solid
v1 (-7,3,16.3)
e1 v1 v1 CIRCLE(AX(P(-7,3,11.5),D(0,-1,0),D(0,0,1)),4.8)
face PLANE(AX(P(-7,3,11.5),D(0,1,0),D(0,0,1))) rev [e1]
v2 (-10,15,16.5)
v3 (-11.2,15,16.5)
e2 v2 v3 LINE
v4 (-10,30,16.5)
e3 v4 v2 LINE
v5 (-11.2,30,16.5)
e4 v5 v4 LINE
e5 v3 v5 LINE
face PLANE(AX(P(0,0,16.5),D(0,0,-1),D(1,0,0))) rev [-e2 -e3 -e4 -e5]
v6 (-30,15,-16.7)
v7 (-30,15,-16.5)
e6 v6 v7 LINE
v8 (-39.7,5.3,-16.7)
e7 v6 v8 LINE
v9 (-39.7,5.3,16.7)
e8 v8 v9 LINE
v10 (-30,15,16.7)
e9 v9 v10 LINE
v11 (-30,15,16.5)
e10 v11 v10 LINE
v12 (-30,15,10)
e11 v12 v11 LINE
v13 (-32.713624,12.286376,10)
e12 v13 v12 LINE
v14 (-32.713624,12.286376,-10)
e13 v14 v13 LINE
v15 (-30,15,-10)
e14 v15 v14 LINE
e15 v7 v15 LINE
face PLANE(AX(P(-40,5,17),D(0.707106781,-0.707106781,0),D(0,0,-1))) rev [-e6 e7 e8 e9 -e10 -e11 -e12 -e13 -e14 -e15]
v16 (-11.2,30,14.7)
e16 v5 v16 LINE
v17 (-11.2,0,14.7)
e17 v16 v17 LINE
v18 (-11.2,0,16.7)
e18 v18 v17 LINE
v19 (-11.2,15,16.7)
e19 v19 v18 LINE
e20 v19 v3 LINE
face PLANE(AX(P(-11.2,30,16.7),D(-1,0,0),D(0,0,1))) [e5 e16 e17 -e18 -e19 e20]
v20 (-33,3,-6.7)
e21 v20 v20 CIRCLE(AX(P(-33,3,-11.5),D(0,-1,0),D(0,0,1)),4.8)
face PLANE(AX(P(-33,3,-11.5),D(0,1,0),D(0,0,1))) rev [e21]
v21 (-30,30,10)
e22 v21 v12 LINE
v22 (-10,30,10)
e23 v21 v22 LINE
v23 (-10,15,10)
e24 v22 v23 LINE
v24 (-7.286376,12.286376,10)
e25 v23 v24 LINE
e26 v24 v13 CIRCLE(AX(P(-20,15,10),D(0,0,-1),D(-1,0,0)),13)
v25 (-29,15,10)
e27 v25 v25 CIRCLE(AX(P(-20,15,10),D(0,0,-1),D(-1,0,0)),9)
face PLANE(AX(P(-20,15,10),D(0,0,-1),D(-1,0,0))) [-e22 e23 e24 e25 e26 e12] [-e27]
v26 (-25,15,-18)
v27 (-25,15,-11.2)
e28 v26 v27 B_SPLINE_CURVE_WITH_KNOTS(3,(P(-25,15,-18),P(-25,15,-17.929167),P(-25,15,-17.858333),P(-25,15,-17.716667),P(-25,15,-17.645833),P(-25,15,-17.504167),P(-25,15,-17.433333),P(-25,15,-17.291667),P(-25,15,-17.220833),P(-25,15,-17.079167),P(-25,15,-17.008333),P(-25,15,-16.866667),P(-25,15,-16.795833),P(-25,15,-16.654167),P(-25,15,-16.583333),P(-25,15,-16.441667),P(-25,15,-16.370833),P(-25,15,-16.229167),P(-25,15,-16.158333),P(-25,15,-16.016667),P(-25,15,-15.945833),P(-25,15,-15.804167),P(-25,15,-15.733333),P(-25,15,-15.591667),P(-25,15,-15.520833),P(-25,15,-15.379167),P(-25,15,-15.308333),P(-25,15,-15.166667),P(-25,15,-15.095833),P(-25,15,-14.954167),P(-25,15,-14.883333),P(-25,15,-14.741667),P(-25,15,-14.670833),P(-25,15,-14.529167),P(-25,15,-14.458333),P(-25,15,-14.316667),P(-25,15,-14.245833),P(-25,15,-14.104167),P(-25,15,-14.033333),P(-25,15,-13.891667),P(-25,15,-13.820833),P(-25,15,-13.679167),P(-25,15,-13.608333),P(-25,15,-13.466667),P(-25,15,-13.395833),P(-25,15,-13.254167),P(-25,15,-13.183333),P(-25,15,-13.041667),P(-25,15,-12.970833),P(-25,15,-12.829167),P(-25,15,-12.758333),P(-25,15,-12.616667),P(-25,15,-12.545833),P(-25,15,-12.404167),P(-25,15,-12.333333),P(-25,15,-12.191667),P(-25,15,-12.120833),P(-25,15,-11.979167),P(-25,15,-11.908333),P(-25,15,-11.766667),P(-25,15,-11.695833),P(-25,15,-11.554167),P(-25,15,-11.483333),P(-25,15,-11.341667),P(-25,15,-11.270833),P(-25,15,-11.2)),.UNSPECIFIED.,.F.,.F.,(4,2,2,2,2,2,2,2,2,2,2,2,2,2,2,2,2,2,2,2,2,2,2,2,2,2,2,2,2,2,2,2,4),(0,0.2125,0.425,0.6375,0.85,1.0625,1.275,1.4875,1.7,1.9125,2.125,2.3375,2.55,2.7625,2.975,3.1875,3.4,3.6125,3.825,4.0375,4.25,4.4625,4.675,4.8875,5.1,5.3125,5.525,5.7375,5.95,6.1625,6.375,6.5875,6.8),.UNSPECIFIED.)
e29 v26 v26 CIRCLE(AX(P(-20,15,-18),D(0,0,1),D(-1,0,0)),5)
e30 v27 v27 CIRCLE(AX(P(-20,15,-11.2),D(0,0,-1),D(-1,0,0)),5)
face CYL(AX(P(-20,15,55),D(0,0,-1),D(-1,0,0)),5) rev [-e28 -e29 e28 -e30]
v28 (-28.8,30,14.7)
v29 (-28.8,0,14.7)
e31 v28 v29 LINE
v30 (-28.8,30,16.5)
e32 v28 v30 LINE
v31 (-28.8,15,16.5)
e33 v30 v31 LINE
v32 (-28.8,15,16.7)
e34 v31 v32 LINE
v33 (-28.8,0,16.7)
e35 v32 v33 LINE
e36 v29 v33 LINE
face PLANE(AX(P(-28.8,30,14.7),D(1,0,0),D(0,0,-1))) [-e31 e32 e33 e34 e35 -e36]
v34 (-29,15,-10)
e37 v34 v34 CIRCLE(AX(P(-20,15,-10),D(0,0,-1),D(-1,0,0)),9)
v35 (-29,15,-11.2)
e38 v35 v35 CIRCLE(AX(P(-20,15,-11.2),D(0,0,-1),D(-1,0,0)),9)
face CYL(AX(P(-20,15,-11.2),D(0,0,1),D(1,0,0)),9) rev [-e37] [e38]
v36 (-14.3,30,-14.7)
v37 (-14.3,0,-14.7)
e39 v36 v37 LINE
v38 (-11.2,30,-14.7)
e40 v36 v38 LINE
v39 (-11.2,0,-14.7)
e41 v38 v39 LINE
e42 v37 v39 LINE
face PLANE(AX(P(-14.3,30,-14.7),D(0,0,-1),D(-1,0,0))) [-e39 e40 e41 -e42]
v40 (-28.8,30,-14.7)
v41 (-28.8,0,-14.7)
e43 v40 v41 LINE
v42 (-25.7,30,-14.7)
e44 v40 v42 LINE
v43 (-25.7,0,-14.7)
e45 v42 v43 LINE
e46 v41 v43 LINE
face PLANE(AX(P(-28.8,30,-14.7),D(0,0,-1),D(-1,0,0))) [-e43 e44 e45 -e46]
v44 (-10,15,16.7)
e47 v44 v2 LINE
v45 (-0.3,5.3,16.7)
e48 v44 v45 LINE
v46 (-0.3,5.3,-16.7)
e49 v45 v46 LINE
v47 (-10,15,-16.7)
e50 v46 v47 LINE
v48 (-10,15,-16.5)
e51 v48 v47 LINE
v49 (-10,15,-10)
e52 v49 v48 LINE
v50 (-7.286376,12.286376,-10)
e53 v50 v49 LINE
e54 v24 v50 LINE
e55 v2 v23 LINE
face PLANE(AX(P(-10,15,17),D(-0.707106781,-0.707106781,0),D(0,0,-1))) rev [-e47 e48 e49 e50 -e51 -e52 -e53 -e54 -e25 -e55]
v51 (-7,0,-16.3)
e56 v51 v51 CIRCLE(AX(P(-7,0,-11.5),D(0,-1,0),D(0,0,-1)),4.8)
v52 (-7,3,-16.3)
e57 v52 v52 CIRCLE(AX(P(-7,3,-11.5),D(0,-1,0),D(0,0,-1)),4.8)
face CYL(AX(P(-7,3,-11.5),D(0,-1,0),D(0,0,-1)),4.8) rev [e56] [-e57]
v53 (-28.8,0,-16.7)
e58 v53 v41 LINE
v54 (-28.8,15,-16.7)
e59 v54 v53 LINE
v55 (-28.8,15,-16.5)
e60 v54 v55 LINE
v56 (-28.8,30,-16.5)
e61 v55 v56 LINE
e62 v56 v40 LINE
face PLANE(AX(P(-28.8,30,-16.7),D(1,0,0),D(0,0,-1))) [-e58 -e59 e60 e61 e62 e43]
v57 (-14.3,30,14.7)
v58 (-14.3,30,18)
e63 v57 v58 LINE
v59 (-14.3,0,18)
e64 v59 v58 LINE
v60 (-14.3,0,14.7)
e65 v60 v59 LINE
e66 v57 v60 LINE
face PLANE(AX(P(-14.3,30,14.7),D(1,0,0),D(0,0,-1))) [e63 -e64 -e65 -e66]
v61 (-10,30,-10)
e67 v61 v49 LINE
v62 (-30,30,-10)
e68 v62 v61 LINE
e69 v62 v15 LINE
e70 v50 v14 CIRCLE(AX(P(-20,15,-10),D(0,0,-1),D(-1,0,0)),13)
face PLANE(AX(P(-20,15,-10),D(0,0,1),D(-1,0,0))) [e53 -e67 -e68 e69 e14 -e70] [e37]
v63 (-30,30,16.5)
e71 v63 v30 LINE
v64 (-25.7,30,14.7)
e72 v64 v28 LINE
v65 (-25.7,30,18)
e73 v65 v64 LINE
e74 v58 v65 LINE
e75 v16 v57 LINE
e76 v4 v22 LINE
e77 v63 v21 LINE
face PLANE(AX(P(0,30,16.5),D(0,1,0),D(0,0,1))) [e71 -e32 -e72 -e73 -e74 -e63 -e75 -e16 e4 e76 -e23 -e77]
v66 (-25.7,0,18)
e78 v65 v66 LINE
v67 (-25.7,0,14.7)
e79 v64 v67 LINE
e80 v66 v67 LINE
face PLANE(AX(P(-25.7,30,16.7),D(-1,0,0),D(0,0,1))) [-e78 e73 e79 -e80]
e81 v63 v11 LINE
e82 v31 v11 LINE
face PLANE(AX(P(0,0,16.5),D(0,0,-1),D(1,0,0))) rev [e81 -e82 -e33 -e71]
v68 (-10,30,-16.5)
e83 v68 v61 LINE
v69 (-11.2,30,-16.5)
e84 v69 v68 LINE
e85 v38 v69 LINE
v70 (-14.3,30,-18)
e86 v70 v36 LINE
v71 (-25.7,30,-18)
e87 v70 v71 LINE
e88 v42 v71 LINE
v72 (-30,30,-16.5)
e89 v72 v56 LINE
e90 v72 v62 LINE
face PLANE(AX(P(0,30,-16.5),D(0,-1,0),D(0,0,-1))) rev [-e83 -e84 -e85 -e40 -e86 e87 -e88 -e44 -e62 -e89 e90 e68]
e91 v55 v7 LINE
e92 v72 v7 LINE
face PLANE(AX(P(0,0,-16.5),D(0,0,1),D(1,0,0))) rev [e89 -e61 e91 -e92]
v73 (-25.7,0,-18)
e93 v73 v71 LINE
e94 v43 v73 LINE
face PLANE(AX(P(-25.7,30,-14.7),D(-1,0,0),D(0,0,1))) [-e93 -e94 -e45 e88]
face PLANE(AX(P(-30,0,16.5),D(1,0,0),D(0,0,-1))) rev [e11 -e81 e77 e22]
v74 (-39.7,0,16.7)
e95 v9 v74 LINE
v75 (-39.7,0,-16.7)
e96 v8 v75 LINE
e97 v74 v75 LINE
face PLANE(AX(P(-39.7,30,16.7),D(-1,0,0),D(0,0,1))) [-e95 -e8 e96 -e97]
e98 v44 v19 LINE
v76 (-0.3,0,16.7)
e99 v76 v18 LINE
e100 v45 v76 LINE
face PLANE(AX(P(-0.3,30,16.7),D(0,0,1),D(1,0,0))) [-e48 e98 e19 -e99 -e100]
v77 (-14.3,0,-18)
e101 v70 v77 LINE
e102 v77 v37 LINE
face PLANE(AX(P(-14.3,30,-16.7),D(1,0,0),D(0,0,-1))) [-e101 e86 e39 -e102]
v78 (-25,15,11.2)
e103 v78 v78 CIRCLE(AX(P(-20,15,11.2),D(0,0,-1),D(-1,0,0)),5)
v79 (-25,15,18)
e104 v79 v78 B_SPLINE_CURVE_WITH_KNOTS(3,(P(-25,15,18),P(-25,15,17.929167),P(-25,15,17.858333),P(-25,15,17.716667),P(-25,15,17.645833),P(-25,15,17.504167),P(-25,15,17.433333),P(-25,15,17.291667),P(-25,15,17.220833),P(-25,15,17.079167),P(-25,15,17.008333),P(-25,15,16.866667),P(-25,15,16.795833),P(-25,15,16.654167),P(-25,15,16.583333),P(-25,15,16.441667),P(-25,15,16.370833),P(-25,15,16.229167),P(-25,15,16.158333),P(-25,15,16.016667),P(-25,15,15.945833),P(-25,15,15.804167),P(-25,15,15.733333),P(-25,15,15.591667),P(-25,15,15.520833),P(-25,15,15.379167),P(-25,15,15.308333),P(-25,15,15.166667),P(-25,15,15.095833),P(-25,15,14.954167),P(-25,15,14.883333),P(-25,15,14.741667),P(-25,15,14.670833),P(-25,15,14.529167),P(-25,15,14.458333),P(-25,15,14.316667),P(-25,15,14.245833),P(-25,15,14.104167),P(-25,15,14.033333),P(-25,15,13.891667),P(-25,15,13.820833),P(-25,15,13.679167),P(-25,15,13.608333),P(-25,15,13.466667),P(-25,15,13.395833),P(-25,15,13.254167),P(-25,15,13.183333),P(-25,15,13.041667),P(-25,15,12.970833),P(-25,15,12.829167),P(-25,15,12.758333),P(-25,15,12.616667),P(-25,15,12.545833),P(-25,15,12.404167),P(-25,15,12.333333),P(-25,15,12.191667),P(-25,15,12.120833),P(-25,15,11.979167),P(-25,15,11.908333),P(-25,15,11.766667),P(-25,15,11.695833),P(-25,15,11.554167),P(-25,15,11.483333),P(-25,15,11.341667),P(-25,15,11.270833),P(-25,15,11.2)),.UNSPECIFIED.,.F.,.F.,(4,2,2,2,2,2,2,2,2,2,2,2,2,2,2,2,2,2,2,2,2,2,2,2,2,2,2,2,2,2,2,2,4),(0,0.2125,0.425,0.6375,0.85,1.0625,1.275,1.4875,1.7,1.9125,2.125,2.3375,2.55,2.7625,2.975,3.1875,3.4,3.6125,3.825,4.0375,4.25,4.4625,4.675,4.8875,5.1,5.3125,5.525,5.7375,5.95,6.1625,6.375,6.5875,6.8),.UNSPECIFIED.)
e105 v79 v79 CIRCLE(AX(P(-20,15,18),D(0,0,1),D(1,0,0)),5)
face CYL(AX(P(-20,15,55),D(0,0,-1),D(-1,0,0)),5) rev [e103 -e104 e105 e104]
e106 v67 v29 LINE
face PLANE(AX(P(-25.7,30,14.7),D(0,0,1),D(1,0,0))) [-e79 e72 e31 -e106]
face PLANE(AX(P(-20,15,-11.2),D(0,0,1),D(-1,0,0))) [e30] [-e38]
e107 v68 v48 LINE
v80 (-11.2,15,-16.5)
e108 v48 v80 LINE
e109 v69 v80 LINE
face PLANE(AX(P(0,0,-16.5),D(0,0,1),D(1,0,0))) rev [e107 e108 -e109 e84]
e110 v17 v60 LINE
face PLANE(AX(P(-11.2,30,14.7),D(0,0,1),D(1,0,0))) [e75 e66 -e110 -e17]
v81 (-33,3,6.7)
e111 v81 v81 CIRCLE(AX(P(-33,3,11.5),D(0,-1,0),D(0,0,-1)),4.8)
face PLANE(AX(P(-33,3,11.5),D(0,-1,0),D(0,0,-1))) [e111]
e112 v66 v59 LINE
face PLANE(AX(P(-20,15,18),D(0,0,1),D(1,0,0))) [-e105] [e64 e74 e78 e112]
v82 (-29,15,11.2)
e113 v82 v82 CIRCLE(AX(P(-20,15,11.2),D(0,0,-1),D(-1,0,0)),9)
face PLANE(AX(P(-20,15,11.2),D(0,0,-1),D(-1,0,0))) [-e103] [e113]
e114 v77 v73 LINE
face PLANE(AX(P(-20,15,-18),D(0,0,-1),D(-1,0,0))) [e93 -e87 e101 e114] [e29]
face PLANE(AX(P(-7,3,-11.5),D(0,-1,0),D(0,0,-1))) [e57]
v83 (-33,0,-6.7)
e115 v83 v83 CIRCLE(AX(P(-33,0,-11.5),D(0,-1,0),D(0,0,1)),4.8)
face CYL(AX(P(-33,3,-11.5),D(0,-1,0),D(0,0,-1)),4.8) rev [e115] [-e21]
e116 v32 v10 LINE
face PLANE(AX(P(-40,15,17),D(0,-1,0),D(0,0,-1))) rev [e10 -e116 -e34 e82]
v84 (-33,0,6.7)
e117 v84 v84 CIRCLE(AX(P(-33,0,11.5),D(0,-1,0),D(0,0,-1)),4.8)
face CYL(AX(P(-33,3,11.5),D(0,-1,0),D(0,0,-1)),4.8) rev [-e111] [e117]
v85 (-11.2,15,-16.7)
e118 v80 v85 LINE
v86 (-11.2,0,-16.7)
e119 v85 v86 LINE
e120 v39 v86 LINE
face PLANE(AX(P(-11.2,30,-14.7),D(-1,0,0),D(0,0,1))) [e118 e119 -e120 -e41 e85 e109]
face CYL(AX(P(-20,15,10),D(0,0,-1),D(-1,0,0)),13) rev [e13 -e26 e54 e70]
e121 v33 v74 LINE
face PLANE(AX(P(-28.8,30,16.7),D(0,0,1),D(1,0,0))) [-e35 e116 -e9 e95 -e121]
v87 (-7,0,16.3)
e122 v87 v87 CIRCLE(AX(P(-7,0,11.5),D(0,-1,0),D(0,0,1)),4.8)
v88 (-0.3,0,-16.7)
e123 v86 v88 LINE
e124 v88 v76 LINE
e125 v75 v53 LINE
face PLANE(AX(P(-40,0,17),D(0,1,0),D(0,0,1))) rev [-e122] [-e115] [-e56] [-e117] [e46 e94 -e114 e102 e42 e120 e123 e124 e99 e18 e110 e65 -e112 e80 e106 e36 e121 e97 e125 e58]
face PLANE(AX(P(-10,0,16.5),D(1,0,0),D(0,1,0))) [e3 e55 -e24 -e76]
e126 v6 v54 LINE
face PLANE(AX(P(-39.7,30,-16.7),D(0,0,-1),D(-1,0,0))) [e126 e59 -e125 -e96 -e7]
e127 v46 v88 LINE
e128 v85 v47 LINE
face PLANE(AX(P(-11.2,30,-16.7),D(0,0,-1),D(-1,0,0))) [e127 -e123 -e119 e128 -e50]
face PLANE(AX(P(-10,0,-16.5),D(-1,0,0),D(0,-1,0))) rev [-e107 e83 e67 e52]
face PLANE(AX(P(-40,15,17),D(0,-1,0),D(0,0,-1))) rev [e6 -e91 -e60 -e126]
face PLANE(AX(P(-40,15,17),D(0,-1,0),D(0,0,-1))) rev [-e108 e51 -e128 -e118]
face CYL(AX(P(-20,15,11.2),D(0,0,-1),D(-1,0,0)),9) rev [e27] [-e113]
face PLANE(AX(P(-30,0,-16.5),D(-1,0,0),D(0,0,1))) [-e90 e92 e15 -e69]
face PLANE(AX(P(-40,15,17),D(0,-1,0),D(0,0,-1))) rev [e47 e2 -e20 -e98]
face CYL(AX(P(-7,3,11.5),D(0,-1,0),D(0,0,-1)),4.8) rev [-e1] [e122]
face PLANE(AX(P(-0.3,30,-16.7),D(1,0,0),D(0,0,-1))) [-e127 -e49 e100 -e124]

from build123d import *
from build123d.topology import SkipClean

# Parameters (mm, degrees)
SKETCH5_W            = 40
SKETCH5_H            = 15
BOSS_EXTRUDE2_DEPTH  = 17
SKETCH6_R            = 13
CUT_EXTRUDE4_DEPTH   = 10
SKETCH7_R            = 2.5
CUT_EXTRUDE5_DEPTH   = 4.5
CHAMFER8_SIZE        = 10
BOSS_EXTRUDE3_START  = -6.5
BOSS_EXTRUDE3_DEPTH  = 6.5
SKETCH8_R            = 4.8
CUT_EXTRUDE8_DEPTH   = 3
SKETCH9_W            = 2.5
SKETCH9_H            = 2
CUT_EXTRUDE7_DEPTH   = 52
SKETCH11_R           = 5
CUT_EXTRUDE9_DEPTH   = 45
SKETCH12_R           = 9
SKETCH12_R_2         = 5
CUT_EXTRUDE11_DEPTH  = 1.2
CUT_EXTRUDE12_DEPTH  = 53.810983706
BOSS_EXTRUDE4_START  = 1.3
BOSS_EXTRUDE4_DEPTH  = 1.3
BOSS_EXTRUDE8_START  = -33.4
BOSS_EXTRUDE8_DEPTH  = 1.3
BOSS_EXTRUDE9_DEPTH  = 1.5
BOSS_EXTRUDE10_START = -34.5
BOSS_EXTRUDE10_DEPTH = 1.5


# Read off the part's stored shape, not the designer's step: Boss-Extrude3
with BuildPart() as part:
    # Sketch5 → Boss-Extrude2 (new body)
    with BuildSketch(Plane.XY):
        with Locations((-20, 7.5)):
            Rectangle(SKETCH5_W, SKETCH5_H)
    boss_extrude2 = extrude(amount=BOSS_EXTRUDE2_DEPTH)

    # Sketch6 → Cut-Extrude4 (cut)
    with BuildSketch(Plane(origin=(0, 0, 0), x_dir=(-1, 0, 0), z_dir=(0, 0, -1))):
        with Locations((20, 15)):
            Circle(SKETCH6_R)
    cut_extrude4 = extrude(amount=-CUT_EXTRUDE4_DEPTH, mode=Mode.SUBTRACT)

    # Sketch7 → Cut-Extrude5 (cut)
    with BuildSketch(Plane.XY.offset(17)):
        with Locations((-20, 15)):
            Circle(SKETCH7_R)
    cut_extrude5 = extrude(amount=-CUT_EXTRUDE5_DEPTH, mode=Mode.SUBTRACT)

    # Mirror5: Boss-Extrude2, Cut-Extrude4, Cut-Extrude5 across plane
    with SkipClean():  # the faces are left unmerged after this step: merging them gives an invalid solid
        add(boss_extrude2.mirror(Plane.XY))
        add(cut_extrude4.mirror(Plane.XY), mode=Mode.SUBTRACT)
        add(cut_extrude5.mirror(Plane.XY), mode=Mode.SUBTRACT)
    add(part.part.scale(1), mode=Mode.REPLACE)  # the faces are merged on a copy

    # Chamfer8
    # the kernel refuses this chamfer: 10 mm, written as the material it takes off along each edge
    with BuildSketch(Plane(origin=(-40, 15, -42.71682988), x_dir=(0.9996219169112968, 0.027495876610586317, 0), z_dir=(0, 0, 1)), Plane(origin=(0, 15, 42.71682988), x_dir=(-0.9996219169112968, 0.027495876610586317, 0), z_dir=(0, 0, -1))) as chamfer8_piece_1:
        Polygon((CHAMFER8_SIZE * 0.999621916911, -CHAMFER8_SIZE * 0.0274958766106), (-CHAMFER8_SIZE * 0.0274958766106, -CHAMFER8_SIZE * 0.999621916911), (0, 0), align=None)
    extrude(amount=85.433659759, mode=Mode.SUBTRACT)

    # Boss-Extrude3 outline → Boss-Extrude3 (add)
    with BuildSketch(Plane.XY.offset(-10).offset(BOSS_EXTRUDE3_START)):
        with BuildLine():
            Line((-10, 30), (-30, 30))
            Line((-30, 30), (-30, 15))
            Line((-30, 15), (-22.5, 15))
            ThreePointArc((-22.5, 15), (-20, 12.5), (-17.5, 15))
            Line((-17.5, 15), (-10, 15))
            Line((-10, 15), (-10, 30))
        make_face()
    boss_extrude3 = extrude(amount=BOSS_EXTRUDE3_DEPTH)

    # Mirror6: Boss-Extrude3 across plane
    add(boss_extrude3.mirror(Plane(origin=(0, 0, 0), x_dir=(1, 0, 0), z_dir=(0, 0, -1))))

    # Sketch8 → Cut-Extrude8 (cut)
    with BuildSketch(Plane.XZ):
        with Locations(Location((-33, 11.5, 0), (0, 0, 270))):
            Circle(SKETCH8_R)
        with Locations(Location((-7, 11.5, 0), (0, 0, 90))):
            Circle(SKETCH8_R)
        with Locations(Location((-7, -11.5, 0), (0, 0, 270))):
            Circle(SKETCH8_R)
        with Locations(Location((-33, -11.5, 0), (0, 0, 90))):
            Circle(SKETCH8_R)
    extrude(amount=-CUT_EXTRUDE8_DEPTH, mode=Mode.SUBTRACT)

    # Sketch9 → Cut-Extrude7 (cut)
    with BuildSketch(Plane.XZ):
        with Locations((-12.75, 16)):
            Rectangle(SKETCH9_W, SKETCH9_H)
        with Locations((-27.25, 16)):
            Rectangle(SKETCH9_W, SKETCH9_H)
        with Locations((-12.75, -16)):
            Rectangle(SKETCH9_W, SKETCH9_H)
        with Locations((-27.25, -16)):
            Rectangle(SKETCH9_W, SKETCH9_H)
    extrude(amount=-CUT_EXTRUDE7_DEPTH, mode=Mode.SUBTRACT)

    # Sketch11 → Cut-Extrude9 (cut, symmetric)
    with BuildSketch(Plane(origin=(0, 0, 10), x_dir=(-1, 0, 0), z_dir=(0, 0, -1))):
        with Locations((20, 15)):
            Circle(SKETCH11_R)
    extrude(amount=CUT_EXTRUDE9_DEPTH, both=True, mode=Mode.SUBTRACT)

    # Sketch12 → Cut-Extrude11 (cut)
    with BuildSketch(Plane(origin=(0, 0, 10), x_dir=(-1, 0, 0), z_dir=(0, 0, -1))):
        with Locations((20, 15)):
            Circle(SKETCH12_R)
        with Locations((20, 15)):
            Circle(SKETCH12_R_2, mode=Mode.SUBTRACT)
    cut_extrude11 = extrude(amount=-CUT_EXTRUDE11_DEPTH, mode=Mode.SUBTRACT)

    # Mirror7: Cut-Extrude11 across plane
    add(cut_extrude11.mirror(Plane(origin=(0, 0, 0), x_dir=(1, 0, 0), z_dir=(0, 0, -1))), mode=Mode.SUBTRACT)

    # Sketch13 → Cut-Extrude12 (cut, through all)
    with BuildSketch(Plane.XZ):
        Polygon((-26, 15), (-28.5, 15), (-28.5, 17), (-40, 17), (-40, -17), (-28.5, -17), (-28.5, -15), (-26, -15), (-26, -17), (-14, -17), (-14, -15), (-11.5, -15), (-11.5, -17), (0, -17), (0, 17), (-11.5, 17), (-11.5, 15), (-14, 15), (-14, 17), (-26, 17), align=None)
        Polygon((-25.7, 14.7), (-28.8, 14.7), (-28.8, 16.7), (-39.7, 16.7), (-39.7, -16.7), (-28.8, -16.7), (-28.8, -14.7), (-25.7, -14.7), (-25.7, -16.7), (-14.3, -16.7), (-14.3, -14.7), (-11.2, -14.7), (-11.2, -16.7), (-0.3, -16.7), (-0.3, 16.7), (-11.2, 16.7), (-11.2, 14.7), (-14.3, 14.7), (-14.3, 16.7), (-25.7, 16.7), align=None, mode=Mode.SUBTRACT)
    extrude(amount=-CUT_EXTRUDE12_DEPTH, mode=Mode.SUBTRACT)

    # Sketch14 → Boss-Extrude4 (add)
    with SkipClean():  # the faces are left unmerged after this step: merging them gives an invalid solid
        with BuildSketch(Plane(origin=(0, 0, -16.7), x_dir=(-1, 0, 0), z_dir=(0, 0, -1)).offset(BOSS_EXTRUDE4_START)):
            with BuildLine():
                Line((15, 15), (14.3, 15))
                Line((14.3, 15), (14.3, 0))
                Line((14.3, 0), (25.7, 0))
                Line((25.7, 0), (25.7, 15))
                Line((25.7, 15), (25, 15))
                ThreePointArc((25, 15), (20, 10), (15, 15))
            make_face()
        extrude(amount=-BOSS_EXTRUDE4_DEPTH)
    add(part.part.scale(1), mode=Mode.REPLACE)  # the faces are merged on a copy

    # Sketch14<3> → Boss-Extrude8 (add)
    with BuildSketch(Plane(origin=(0, 0, -16.7), x_dir=(-1, 0, 0), z_dir=(0, 0, -1)).offset(BOSS_EXTRUDE8_START)):
        with BuildLine():
            Line((15, 15), (14.3, 15))
            Line((14.3, 15), (14.3, 0))
            Line((14.3, 0), (25.7, 0))
            Line((25.7, 0), (25.7, 15))
            Line((25.7, 15), (25, 15))
            ThreePointArc((25, 15), (20, 10), (15, 15))
        make_face()
    extrude(amount=-BOSS_EXTRUDE8_DEPTH)

    # Sketch16 → Boss-Extrude9 (add)
    with BuildSketch(Plane.XY.offset(16.5)):
        with BuildLine():
            Line((-25.7, 30), (-25.7, 15))
            Line((-25.7, 15), (-25, 15))
            ThreePointArc((-25, 15), (-20, 20), (-15, 15))
            Line((-15, 15), (-14.3, 15))
            Line((-14.3, 15), (-14.3, 30))
            Line((-14.3, 30), (-25.7, 30))
        make_face()
    extrude(amount=BOSS_EXTRUDE9_DEPTH)

    # Sketch16<2> → Boss-Extrude10 (add)
    with SkipClean():  # the faces are left unmerged after this step: merging them gives an invalid solid
        with BuildSketch(Plane.XY.offset(16.5).offset(BOSS_EXTRUDE10_START)):
            with BuildLine():
                Line((-25.7, 30), (-25.7, 15))
                Line((-25.7, 15), (-25, 15))
                ThreePointArc((-25, 15), (-20, 20), (-15, 15))
                Line((-15, 15), (-14.3, 15))
                Line((-14.3, 15), (-14.3, 30))
                Line((-14.3, 30), (-25.7, 30))
            make_face()
        extrude(amount=BOSS_EXTRUDE10_DEPTH)
    add(part.part.scale(1), mode=Mode.REPLACE)  # the faces are merged on a copy


solid = part.part
